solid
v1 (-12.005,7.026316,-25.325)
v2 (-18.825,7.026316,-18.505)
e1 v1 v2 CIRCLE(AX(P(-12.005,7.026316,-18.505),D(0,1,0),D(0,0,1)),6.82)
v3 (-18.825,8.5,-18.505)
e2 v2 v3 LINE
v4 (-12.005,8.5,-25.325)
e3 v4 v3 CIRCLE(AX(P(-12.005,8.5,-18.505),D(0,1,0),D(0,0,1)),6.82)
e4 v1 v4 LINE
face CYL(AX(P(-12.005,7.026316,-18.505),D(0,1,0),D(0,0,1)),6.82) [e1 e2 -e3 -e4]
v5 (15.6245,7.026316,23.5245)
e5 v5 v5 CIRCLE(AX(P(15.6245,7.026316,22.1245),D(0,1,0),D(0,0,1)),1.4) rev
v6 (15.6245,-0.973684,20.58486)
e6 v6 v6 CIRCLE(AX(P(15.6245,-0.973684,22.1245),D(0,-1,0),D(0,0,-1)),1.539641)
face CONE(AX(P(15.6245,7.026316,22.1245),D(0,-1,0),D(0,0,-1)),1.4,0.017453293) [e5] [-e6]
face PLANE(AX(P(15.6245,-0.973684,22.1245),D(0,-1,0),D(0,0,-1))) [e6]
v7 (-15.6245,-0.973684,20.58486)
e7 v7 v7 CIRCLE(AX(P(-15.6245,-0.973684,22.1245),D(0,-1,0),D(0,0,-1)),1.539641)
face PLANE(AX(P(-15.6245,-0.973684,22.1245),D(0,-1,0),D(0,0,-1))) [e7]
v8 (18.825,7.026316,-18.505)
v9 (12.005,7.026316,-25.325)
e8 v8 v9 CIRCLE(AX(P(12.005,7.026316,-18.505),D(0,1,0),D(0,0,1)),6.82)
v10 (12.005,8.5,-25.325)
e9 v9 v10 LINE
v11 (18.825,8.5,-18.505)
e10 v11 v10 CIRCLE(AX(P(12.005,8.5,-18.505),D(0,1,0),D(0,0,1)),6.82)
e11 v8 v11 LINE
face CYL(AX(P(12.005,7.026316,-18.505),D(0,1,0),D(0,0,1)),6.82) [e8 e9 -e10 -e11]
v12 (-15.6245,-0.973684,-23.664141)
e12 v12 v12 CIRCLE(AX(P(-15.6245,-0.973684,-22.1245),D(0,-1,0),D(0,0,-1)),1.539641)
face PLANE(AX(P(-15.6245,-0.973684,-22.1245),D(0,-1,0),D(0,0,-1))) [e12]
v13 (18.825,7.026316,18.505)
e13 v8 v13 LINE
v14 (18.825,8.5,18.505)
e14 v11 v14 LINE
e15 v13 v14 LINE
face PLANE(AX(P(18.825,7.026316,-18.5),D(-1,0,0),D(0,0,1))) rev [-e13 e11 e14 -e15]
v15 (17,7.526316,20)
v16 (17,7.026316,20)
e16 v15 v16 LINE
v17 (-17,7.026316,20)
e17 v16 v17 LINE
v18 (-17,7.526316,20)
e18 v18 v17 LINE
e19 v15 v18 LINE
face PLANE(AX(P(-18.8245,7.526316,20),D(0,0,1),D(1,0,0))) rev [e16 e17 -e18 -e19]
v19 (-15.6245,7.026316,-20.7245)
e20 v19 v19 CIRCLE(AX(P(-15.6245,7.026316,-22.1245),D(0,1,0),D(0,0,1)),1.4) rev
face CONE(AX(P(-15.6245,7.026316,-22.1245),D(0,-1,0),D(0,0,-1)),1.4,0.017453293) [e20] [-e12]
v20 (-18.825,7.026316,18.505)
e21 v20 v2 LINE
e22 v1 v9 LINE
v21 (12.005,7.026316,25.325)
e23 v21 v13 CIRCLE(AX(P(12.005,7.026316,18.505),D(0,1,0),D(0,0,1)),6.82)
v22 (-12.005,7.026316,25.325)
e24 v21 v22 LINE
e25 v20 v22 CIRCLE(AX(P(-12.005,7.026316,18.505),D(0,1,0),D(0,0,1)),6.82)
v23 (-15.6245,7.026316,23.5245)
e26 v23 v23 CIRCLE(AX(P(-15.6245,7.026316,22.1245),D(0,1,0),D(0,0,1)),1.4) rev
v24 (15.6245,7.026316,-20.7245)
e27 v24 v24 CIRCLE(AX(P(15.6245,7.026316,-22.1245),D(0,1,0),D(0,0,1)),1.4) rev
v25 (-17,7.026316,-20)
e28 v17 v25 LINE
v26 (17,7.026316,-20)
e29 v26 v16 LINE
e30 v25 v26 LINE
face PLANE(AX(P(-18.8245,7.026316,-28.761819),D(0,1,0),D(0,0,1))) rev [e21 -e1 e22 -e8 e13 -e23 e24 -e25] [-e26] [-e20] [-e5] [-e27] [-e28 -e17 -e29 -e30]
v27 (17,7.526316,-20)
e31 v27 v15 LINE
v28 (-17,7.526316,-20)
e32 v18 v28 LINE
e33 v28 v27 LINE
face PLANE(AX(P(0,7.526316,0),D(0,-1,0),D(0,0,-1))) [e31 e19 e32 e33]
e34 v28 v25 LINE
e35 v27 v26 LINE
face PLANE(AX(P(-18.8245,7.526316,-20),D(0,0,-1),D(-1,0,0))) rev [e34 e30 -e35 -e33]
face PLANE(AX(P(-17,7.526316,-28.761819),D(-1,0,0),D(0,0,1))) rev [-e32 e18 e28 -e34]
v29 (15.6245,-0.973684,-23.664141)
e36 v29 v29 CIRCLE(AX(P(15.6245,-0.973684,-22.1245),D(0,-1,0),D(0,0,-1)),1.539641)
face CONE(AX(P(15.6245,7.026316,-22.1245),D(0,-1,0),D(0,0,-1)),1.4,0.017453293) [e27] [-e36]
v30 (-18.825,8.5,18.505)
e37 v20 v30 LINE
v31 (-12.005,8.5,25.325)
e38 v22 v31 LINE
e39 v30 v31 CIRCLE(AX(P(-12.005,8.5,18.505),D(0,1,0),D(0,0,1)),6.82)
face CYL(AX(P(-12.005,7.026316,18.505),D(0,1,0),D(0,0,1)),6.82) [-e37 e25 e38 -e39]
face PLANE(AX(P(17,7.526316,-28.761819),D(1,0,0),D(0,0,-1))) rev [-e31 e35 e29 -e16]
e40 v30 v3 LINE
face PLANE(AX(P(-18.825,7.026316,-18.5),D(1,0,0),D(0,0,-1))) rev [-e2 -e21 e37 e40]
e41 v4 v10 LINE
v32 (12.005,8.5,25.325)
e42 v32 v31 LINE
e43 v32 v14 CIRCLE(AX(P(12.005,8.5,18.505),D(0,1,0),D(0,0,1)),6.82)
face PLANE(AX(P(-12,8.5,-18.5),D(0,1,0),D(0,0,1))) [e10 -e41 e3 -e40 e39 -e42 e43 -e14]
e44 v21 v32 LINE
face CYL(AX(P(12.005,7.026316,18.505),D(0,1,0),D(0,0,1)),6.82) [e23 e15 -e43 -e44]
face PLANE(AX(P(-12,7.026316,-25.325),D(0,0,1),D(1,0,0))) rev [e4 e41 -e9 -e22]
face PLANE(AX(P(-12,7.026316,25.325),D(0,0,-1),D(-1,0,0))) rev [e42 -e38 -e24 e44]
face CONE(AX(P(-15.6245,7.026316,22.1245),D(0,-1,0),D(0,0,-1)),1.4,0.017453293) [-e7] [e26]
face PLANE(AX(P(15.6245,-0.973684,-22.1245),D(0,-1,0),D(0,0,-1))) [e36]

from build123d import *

# Parameters (mm, degrees)
BOSS_EXTRUDE1_DEPTH           = 8.5
FILLET1_R                     = 7
CUT_EXTRUDE1_DEPTH            = 38.350780577
CUT_EXTRUDE1_DEPTH_BACK       = 38.350780577
CUT_EXTRUDE2_DEPTH            = 0.5
FILLET2_R                     = 1
SKETCH7_R                     = 1.4
BOSS_EXTRUDE2_DEPTH           = 8
BOSS_EXTRUDE2_DRAFT           = -1
BOSS_EXTRUDE2_PROFILE_2_DEPTH = 8
BOSS_EXTRUDE2_PROFILE_2_DRAFT = -1
BOSS_EXTRUDE2_PROFILE_3_DEPTH = 8
BOSS_EXTRUDE2_PROFILE_3_DRAFT = -1
BOSS_EXTRUDE2_PROFILE_4_DEPTH = 8
BOSS_EXTRUDE2_PROFILE_4_DRAFT = -1
BOSS_EXTRUDE4_START           = 7.026316
BOSS_EXTRUDE4_DEPTH           = 1.473684
CUT_EXTRUDE3_START            = 7.026316
SKETCH12_W                    = 34
SKETCH12_H                    = 40
CUT_EXTRUDE3_DEPTH            = 0.5


with BuildPart() as part:
    # Sketch1 → Boss-Extrude1 (new, symmetric)
    with BuildSketch(Plane(origin=(0, 0, 0), x_dir=(1, 0, 0), z_dir=(0, 1, 0))):
        with BuildLine():
            Line((12, 22.5), (-12, 22.5))
            ThreePointArc((-12, 22.5), (-14.828427125, 21.328427125), (-16, 18.5))
            Line((-16, 18.5), (-16, -18.5))
            ThreePointArc((-16, -18.5), (-14.828427125, -21.328427125), (-12, -22.5))
            Line((-12, -22.5), (12, -22.5))
            ThreePointArc((12, -22.5), (14.828427125, -21.328427125), (16, -18.5))
            Line((16, -18.5), (16, 18.5))
            ThreePointArc((16, 18.5), (14.828427125, 21.328427125), (12, 22.5))
        make_face()
    extrude(amount=BOSS_EXTRUDE1_DEPTH, both=True)

    # Sweep1: sweep along a path in Sketch3
    with BuildLine(Plane(origin=(0, 0, 0), x_dir=(1, 0, 0), z_dir=(0, 1, 0))) as sweep1_path:
        Line((12, 22.5), (-12, 22.5))
        ThreePointArc((-12, 22.5), (-14.828427125, 21.328427125), (-16, 18.5))
        Line((-16, 18.5), (-16, -18.5))
        ThreePointArc((-16, -18.5), (-14.828427125, -21.328427125), (-12, -22.5))
        Line((-12, -22.5), (12, -22.5))
        ThreePointArc((12, -22.5), (14.828427125, -21.328427125), (16, -18.5))
        Line((16, -18.5), (16, 18.5))
        ThreePointArc((16, 18.5), (14.828427125, 21.328427125), (12, 22.5))
    # Sketch2 → Sweep1 (sweep)
    with BuildSketch(Plane(origin=(0, 0, 0), x_dir=(0, 0, -1), z_dir=(1, 0, 0))):
        with BuildLine():
            Line((22.5, 8.5), (22.5, -8.5))
            ThreePointArc((22.5, -8.5), (28.761818808, 0), (22.5, 8.5))
        make_face()
    sweep(path=sweep1_path.line)

    # Fillet1
    fillet1_edges = [part.edges().sort_by_distance(p)[0] for p in [
        (0, -8.5, 22.5),
        (-14.828427125, -8.5, 21.328427125),
        (-16, -8.5, 0),
        (-14.828427125, -8.5, -21.328427125),
        (-14.828427125, 8.5, 21.328427125),
        (0, 8.5, 22.5),
        (14.828427125, 8.5, 21.328427125),
        (16, 8.5, 0),
        (0, -8.5, -22.5),
        (0, 8.5, -22.5),
        (14.828427125, 8.5, -21.328427125),
        (0, 8.5, -22.5),
        (-14.828427125, 8.5, -21.328427125),
        (0, -8.5, -22.5),
        (-16, 8.5, 0),
        (14.828427125, -8.5, -21.328427125),
        (16, -8.5, 0),
        (14.828427125, -8.5, 21.328427125),
    ]]
    fillet(fillet1_edges, radius=FILLET1_R)

    # Sketch4 → Cut-Extrude1 (cut, two sides: drawn at the far end of the back side and taken through both)
    with BuildSketch(Plane.XY.offset(-CUT_EXTRUDE1_DEPTH_BACK)):
        Polygon((-18.824500057, 7.026315789), (23.208390428, 7.026315789), (23.208390428, -10.963079456), (-23.528948307, -10.963079456), (-23.528948307, 7.026315789), align=None)
    extrude(amount=CUT_EXTRUDE1_DEPTH + CUT_EXTRUDE1_DEPTH_BACK, mode=Mode.SUBTRACT)

    # Sketch6 → Cut-Extrude2 (cut)
    with BuildSketch(Plane.XZ.offset(-7.026315789)):
        with BuildLine():
            Line((13, 20), (-13, 20))
            ThreePointArc((-13, 20), (-15.828427125, 18.828427125), (-17, 16))
            Line((-17, 16), (-17, -16))
            ThreePointArc((-17, -16), (-15.828427125, -18.828427125), (-13, -20))
            Line((-13, -20), (13, -20))
            ThreePointArc((13, -20), (15.828427125, -18.828427125), (17, -16))
            Line((17, -16), (17, 16))
            ThreePointArc((17, 16), (15.828427125, 18.828427125), (13, 20))
        make_face()
    extrude(amount=-CUT_EXTRUDE2_DEPTH, mode=Mode.SUBTRACT)

    # Fillet2
    # the kernel refuses this fillet: 1 mm, written as the material it adds along each edge
    with BuildSketch(Plane(origin=(13, 7.526315789, 20), x_dir=(0, -1, 0), z_dir=(-1, 0, 0)), Plane(origin=(-13, 7.526315789, -20), x_dir=(0, -1, 0), z_dir=(1, 0, 0))) as fillet2_piece_1:
        with BuildLine():
            CenterArc((1, -0.866025404), FILLET2_R, 120, 60)
            Line((0, -0.866025404), (-0.02, -0.866025404))
            Line((-0.02, -0.866025404), (-0.02, 0))
            Line((-0.02, 0), (0, 0.02))
            ThreePointArc((0, 0.02), (0.25, 0.02), (0.49, 0.017320508))
            Line((0.49, 0.017320508), (0.5, 0))
        make_face()
    extrude(amount=26)
    with BuildSketch(Plane(origin=(13, 7.526315789, 16), x_dir=(1, 0, 0), z_dir=(0, 0, -1))) as fillet2_piece_2:
        with BuildLine():
            CenterArc((3.133974596, 1), FILLET2_R, 270, 60)
            Line((3.133974596, 0), (3.133974596, -0.02))
            Line((3.133974596, -0.02), (4, -0.02))
            Line((4, -0.02), (4.02, 0))
            ThreePointArc((4.02, 0), (4.02, 0.25), (4.017320508, 0.49))
            Line((4.017320508, 0.49), (4, 0.5))
        make_face()
    revolve(axis=Axis((13, 7.526315789, 16), (0, -1, 0)), revolution_arc=90)
    with BuildSketch(Plane(origin=(17, 7.526315789, -16), x_dir=(0, -1, 0), z_dir=(0, 0, 1)), Plane(origin=(-17, 7.526315789, 16), x_dir=(0, -1, 0), z_dir=(0, 0, -1))) as fillet2_piece_3:
        with BuildLine():
            CenterArc((1, -0.866025404), FILLET2_R, 120, 60)
            Line((0, -0.866025404), (-0.02, -0.866025404))
            Line((-0.02, -0.866025404), (-0.02, 0))
            Line((-0.02, 0), (0, 0.02))
            ThreePointArc((0, 0.02), (0.25, 0.02), (0.49, 0.017320508))
            Line((0.49, 0.017320508), (0.5, 0))
        make_face()
    extrude(amount=32)
    with BuildSketch(Plane(origin=(13, 7.526315789, -16), x_dir=(0, 0, -1), z_dir=(-1, 0, 0))) as fillet2_piece_4:
        with BuildLine():
            CenterArc((3.133974596, 1), FILLET2_R, 270, 60)
            Line((3.133974596, 0), (3.133974596, -0.02))
            Line((3.133974596, -0.02), (4, -0.02))
            Line((4, -0.02), (4.02, 0))
            ThreePointArc((4.02, 0), (4.02, 0.25), (4.017320508, 0.49))
            Line((4.017320508, 0.49), (4, 0.5))
        make_face()
    revolve(axis=Axis((13, 7.526315789, -16), (0, -1, 0)), revolution_arc=90)
    with BuildSketch(Plane(origin=(-13, 7.526315789, -16), x_dir=(-1, 0, 0), z_dir=(0, 0, 1))) as fillet2_piece_5:
        with BuildLine():
            CenterArc((3.133974596, 1), FILLET2_R, 270, 60)
            Line((3.133974596, 0), (3.133974596, -0.02))
            Line((3.133974596, -0.02), (4, -0.02))
            Line((4, -0.02), (4.02, 0))
            ThreePointArc((4.02, 0), (4.02, 0.25), (4.017320508, 0.49))
            Line((4.017320508, 0.49), (4, 0.5))
        make_face()
    revolve(axis=Axis((-13, 7.526315789, -16), (0, -1, 0)), revolution_arc=90)
    with BuildSketch(Plane(origin=(-13, 7.526315789, 16), x_dir=(0, 0, 1), z_dir=(1, 0, 0))) as fillet2_piece_6:
        with BuildLine():
            CenterArc((3.133974596, 1), FILLET2_R, 270, 60)
            Line((3.133974596, 0), (3.133974596, -0.02))
            Line((3.133974596, -0.02), (4, -0.02))
            Line((4, -0.02), (4.02, 0))
            ThreePointArc((4.02, 0), (4.02, 0.25), (4.017320508, 0.49))
            Line((4.017320508, 0.49), (4, 0.5))
        make_face()
    revolve(axis=Axis((-13, 7.526315789, 16), (0, -1, 0)), revolution_arc=90)


with BuildPart() as boss_extrude2_tool:
    # Sketch7 → Boss-Extrude2 (with draft: the straight prism first)
    with BuildSketch(Plane.XZ.offset(-7.026315789)):
        with Locations((-15.624500057, 22.124500057)):
            Circle(SKETCH7_R)
    extrude(amount=BOSS_EXTRUDE2_DEPTH)
    # Boss-Extrude2: the draft: its side faces are tilted about the plane it starts from
    boss_extrude2_sides = [boss_extrude2_tool.faces().sort_by_distance(p)[0] for p in [
        (-17.024500057, 3.026315789, 22.124500057),
    ]]
    draft(boss_extrude2_sides, Plane.XZ.offset(-7.026315789), BOSS_EXTRUDE2_DRAFT)


with BuildPart() as part_1:
    add(part.part)

    # Boss-Extrude2: add boss_extrude2_tool
    add(boss_extrude2_tool.part)


with BuildPart() as boss_extrude2_profile_2_tool:
    # Sketch7 → Boss-Extrude2 profile 2 (with draft: the straight prism first)
    with BuildSketch(Plane.XZ.offset(-7.026315789)):
        with Locations((15.624500057, 22.124500057)):
            Circle(SKETCH7_R)
    extrude(amount=BOSS_EXTRUDE2_PROFILE_2_DEPTH)
    # Boss-Extrude2 profile 2: the draft: its side faces are tilted about the plane it starts from
    boss_extrude2_profile_2_sides = [boss_extrude2_profile_2_tool.faces().sort_by_distance(p)[0] for p in [
        (14.224500057, 3.026315789, 22.124500057),
    ]]
    draft(boss_extrude2_profile_2_sides, Plane.XZ.offset(-7.026315789), BOSS_EXTRUDE2_PROFILE_2_DRAFT)


with BuildPart() as part_2:
    add(part_1.part)

    # Boss-Extrude2 profile 2: add boss_extrude2_profile_2_tool
    add(boss_extrude2_profile_2_tool.part)


with BuildPart() as boss_extrude2_profile_3_tool:
    # Sketch7 → Boss-Extrude2 profile 3 (with draft: the straight prism first)
    with BuildSketch(Plane.XZ.offset(-7.026315789)):
        with Locations((15.624500057, -22.124500057)):
            Circle(SKETCH7_R)
    extrude(amount=BOSS_EXTRUDE2_PROFILE_3_DEPTH)
    # Boss-Extrude2 profile 3: the draft: its side faces are tilted about the plane it starts from
    boss_extrude2_profile_3_sides = [boss_extrude2_profile_3_tool.faces().sort_by_distance(p)[0] for p in [
        (14.224500057, 3.026315789, -22.124500057),
    ]]
    draft(boss_extrude2_profile_3_sides, Plane.XZ.offset(-7.026315789), BOSS_EXTRUDE2_PROFILE_3_DRAFT)


with BuildPart() as part_3:
    add(part_2.part)

    # Boss-Extrude2 profile 3: add boss_extrude2_profile_3_tool
    add(boss_extrude2_profile_3_tool.part)


with BuildPart() as boss_extrude2_profile_4_tool:
    # Sketch7 → Boss-Extrude2 profile 4 (with draft: the straight prism first)
    with BuildSketch(Plane.XZ.offset(-7.026315789)):
        with Locations((-15.624500057, -22.124500057)):
            Circle(SKETCH7_R)
    extrude(amount=BOSS_EXTRUDE2_PROFILE_4_DEPTH)
    # Boss-Extrude2 profile 4: the draft: its side faces are tilted about the plane it starts from
    boss_extrude2_profile_4_sides = [boss_extrude2_profile_4_tool.faces().sort_by_distance(p)[0] for p in [
        (-17.024500057, 3.026315789, -22.124500057),
    ]]
    draft(boss_extrude2_profile_4_sides, Plane.XZ.offset(-7.026315789), BOSS_EXTRUDE2_PROFILE_4_DRAFT)


with BuildPart() as part_4:
    add(part_3.part)

    # Boss-Extrude2 profile 4: add boss_extrude2_profile_4_tool
    add(boss_extrude2_profile_4_tool.part)

    # Sketch11 → Boss-Extrude4 (add)
    with BuildSketch(Plane(origin=(0, 0, 0), x_dir=(1, 0, 0), z_dir=(0, 1, 0)).offset(BOSS_EXTRUDE4_START)):
        with BuildLine():
            Line((12.005, 25.325), (-12.005, 25.325))
            ThreePointArc((-12.005, 25.325), (-16.827468248, 23.327468248), (-18.825, 18.505))
            Line((-18.825, 18.505), (-18.825, -18.505))
            ThreePointArc((-18.825, -18.505), (-16.827468248, -23.327468248), (-12.005, -25.325))
            Line((-12.005, -25.325), (12.005, -25.325))
            ThreePointArc((12.005, -25.325), (16.827468248, -23.327468248), (18.825, -18.505))
            Line((18.825, -18.505), (18.825, 18.505))
            ThreePointArc((18.825, 18.505), (16.827468248, 23.327468248), (12.005, 25.325))
        make_face()
    extrude(amount=BOSS_EXTRUDE4_DEPTH)

    # Sketch12 → Cut-Extrude3 (cut)
    with BuildSketch(Plane(origin=(0, 0, 0), x_dir=(1, 0, 0), z_dir=(0, 1, 0)).offset(CUT_EXTRUDE3_START)):
        Rectangle(SKETCH12_W, SKETCH12_H)
    extrude(amount=CUT_EXTRUDE3_DEPTH, mode=Mode.SUBTRACT)


solid = part_4.part
